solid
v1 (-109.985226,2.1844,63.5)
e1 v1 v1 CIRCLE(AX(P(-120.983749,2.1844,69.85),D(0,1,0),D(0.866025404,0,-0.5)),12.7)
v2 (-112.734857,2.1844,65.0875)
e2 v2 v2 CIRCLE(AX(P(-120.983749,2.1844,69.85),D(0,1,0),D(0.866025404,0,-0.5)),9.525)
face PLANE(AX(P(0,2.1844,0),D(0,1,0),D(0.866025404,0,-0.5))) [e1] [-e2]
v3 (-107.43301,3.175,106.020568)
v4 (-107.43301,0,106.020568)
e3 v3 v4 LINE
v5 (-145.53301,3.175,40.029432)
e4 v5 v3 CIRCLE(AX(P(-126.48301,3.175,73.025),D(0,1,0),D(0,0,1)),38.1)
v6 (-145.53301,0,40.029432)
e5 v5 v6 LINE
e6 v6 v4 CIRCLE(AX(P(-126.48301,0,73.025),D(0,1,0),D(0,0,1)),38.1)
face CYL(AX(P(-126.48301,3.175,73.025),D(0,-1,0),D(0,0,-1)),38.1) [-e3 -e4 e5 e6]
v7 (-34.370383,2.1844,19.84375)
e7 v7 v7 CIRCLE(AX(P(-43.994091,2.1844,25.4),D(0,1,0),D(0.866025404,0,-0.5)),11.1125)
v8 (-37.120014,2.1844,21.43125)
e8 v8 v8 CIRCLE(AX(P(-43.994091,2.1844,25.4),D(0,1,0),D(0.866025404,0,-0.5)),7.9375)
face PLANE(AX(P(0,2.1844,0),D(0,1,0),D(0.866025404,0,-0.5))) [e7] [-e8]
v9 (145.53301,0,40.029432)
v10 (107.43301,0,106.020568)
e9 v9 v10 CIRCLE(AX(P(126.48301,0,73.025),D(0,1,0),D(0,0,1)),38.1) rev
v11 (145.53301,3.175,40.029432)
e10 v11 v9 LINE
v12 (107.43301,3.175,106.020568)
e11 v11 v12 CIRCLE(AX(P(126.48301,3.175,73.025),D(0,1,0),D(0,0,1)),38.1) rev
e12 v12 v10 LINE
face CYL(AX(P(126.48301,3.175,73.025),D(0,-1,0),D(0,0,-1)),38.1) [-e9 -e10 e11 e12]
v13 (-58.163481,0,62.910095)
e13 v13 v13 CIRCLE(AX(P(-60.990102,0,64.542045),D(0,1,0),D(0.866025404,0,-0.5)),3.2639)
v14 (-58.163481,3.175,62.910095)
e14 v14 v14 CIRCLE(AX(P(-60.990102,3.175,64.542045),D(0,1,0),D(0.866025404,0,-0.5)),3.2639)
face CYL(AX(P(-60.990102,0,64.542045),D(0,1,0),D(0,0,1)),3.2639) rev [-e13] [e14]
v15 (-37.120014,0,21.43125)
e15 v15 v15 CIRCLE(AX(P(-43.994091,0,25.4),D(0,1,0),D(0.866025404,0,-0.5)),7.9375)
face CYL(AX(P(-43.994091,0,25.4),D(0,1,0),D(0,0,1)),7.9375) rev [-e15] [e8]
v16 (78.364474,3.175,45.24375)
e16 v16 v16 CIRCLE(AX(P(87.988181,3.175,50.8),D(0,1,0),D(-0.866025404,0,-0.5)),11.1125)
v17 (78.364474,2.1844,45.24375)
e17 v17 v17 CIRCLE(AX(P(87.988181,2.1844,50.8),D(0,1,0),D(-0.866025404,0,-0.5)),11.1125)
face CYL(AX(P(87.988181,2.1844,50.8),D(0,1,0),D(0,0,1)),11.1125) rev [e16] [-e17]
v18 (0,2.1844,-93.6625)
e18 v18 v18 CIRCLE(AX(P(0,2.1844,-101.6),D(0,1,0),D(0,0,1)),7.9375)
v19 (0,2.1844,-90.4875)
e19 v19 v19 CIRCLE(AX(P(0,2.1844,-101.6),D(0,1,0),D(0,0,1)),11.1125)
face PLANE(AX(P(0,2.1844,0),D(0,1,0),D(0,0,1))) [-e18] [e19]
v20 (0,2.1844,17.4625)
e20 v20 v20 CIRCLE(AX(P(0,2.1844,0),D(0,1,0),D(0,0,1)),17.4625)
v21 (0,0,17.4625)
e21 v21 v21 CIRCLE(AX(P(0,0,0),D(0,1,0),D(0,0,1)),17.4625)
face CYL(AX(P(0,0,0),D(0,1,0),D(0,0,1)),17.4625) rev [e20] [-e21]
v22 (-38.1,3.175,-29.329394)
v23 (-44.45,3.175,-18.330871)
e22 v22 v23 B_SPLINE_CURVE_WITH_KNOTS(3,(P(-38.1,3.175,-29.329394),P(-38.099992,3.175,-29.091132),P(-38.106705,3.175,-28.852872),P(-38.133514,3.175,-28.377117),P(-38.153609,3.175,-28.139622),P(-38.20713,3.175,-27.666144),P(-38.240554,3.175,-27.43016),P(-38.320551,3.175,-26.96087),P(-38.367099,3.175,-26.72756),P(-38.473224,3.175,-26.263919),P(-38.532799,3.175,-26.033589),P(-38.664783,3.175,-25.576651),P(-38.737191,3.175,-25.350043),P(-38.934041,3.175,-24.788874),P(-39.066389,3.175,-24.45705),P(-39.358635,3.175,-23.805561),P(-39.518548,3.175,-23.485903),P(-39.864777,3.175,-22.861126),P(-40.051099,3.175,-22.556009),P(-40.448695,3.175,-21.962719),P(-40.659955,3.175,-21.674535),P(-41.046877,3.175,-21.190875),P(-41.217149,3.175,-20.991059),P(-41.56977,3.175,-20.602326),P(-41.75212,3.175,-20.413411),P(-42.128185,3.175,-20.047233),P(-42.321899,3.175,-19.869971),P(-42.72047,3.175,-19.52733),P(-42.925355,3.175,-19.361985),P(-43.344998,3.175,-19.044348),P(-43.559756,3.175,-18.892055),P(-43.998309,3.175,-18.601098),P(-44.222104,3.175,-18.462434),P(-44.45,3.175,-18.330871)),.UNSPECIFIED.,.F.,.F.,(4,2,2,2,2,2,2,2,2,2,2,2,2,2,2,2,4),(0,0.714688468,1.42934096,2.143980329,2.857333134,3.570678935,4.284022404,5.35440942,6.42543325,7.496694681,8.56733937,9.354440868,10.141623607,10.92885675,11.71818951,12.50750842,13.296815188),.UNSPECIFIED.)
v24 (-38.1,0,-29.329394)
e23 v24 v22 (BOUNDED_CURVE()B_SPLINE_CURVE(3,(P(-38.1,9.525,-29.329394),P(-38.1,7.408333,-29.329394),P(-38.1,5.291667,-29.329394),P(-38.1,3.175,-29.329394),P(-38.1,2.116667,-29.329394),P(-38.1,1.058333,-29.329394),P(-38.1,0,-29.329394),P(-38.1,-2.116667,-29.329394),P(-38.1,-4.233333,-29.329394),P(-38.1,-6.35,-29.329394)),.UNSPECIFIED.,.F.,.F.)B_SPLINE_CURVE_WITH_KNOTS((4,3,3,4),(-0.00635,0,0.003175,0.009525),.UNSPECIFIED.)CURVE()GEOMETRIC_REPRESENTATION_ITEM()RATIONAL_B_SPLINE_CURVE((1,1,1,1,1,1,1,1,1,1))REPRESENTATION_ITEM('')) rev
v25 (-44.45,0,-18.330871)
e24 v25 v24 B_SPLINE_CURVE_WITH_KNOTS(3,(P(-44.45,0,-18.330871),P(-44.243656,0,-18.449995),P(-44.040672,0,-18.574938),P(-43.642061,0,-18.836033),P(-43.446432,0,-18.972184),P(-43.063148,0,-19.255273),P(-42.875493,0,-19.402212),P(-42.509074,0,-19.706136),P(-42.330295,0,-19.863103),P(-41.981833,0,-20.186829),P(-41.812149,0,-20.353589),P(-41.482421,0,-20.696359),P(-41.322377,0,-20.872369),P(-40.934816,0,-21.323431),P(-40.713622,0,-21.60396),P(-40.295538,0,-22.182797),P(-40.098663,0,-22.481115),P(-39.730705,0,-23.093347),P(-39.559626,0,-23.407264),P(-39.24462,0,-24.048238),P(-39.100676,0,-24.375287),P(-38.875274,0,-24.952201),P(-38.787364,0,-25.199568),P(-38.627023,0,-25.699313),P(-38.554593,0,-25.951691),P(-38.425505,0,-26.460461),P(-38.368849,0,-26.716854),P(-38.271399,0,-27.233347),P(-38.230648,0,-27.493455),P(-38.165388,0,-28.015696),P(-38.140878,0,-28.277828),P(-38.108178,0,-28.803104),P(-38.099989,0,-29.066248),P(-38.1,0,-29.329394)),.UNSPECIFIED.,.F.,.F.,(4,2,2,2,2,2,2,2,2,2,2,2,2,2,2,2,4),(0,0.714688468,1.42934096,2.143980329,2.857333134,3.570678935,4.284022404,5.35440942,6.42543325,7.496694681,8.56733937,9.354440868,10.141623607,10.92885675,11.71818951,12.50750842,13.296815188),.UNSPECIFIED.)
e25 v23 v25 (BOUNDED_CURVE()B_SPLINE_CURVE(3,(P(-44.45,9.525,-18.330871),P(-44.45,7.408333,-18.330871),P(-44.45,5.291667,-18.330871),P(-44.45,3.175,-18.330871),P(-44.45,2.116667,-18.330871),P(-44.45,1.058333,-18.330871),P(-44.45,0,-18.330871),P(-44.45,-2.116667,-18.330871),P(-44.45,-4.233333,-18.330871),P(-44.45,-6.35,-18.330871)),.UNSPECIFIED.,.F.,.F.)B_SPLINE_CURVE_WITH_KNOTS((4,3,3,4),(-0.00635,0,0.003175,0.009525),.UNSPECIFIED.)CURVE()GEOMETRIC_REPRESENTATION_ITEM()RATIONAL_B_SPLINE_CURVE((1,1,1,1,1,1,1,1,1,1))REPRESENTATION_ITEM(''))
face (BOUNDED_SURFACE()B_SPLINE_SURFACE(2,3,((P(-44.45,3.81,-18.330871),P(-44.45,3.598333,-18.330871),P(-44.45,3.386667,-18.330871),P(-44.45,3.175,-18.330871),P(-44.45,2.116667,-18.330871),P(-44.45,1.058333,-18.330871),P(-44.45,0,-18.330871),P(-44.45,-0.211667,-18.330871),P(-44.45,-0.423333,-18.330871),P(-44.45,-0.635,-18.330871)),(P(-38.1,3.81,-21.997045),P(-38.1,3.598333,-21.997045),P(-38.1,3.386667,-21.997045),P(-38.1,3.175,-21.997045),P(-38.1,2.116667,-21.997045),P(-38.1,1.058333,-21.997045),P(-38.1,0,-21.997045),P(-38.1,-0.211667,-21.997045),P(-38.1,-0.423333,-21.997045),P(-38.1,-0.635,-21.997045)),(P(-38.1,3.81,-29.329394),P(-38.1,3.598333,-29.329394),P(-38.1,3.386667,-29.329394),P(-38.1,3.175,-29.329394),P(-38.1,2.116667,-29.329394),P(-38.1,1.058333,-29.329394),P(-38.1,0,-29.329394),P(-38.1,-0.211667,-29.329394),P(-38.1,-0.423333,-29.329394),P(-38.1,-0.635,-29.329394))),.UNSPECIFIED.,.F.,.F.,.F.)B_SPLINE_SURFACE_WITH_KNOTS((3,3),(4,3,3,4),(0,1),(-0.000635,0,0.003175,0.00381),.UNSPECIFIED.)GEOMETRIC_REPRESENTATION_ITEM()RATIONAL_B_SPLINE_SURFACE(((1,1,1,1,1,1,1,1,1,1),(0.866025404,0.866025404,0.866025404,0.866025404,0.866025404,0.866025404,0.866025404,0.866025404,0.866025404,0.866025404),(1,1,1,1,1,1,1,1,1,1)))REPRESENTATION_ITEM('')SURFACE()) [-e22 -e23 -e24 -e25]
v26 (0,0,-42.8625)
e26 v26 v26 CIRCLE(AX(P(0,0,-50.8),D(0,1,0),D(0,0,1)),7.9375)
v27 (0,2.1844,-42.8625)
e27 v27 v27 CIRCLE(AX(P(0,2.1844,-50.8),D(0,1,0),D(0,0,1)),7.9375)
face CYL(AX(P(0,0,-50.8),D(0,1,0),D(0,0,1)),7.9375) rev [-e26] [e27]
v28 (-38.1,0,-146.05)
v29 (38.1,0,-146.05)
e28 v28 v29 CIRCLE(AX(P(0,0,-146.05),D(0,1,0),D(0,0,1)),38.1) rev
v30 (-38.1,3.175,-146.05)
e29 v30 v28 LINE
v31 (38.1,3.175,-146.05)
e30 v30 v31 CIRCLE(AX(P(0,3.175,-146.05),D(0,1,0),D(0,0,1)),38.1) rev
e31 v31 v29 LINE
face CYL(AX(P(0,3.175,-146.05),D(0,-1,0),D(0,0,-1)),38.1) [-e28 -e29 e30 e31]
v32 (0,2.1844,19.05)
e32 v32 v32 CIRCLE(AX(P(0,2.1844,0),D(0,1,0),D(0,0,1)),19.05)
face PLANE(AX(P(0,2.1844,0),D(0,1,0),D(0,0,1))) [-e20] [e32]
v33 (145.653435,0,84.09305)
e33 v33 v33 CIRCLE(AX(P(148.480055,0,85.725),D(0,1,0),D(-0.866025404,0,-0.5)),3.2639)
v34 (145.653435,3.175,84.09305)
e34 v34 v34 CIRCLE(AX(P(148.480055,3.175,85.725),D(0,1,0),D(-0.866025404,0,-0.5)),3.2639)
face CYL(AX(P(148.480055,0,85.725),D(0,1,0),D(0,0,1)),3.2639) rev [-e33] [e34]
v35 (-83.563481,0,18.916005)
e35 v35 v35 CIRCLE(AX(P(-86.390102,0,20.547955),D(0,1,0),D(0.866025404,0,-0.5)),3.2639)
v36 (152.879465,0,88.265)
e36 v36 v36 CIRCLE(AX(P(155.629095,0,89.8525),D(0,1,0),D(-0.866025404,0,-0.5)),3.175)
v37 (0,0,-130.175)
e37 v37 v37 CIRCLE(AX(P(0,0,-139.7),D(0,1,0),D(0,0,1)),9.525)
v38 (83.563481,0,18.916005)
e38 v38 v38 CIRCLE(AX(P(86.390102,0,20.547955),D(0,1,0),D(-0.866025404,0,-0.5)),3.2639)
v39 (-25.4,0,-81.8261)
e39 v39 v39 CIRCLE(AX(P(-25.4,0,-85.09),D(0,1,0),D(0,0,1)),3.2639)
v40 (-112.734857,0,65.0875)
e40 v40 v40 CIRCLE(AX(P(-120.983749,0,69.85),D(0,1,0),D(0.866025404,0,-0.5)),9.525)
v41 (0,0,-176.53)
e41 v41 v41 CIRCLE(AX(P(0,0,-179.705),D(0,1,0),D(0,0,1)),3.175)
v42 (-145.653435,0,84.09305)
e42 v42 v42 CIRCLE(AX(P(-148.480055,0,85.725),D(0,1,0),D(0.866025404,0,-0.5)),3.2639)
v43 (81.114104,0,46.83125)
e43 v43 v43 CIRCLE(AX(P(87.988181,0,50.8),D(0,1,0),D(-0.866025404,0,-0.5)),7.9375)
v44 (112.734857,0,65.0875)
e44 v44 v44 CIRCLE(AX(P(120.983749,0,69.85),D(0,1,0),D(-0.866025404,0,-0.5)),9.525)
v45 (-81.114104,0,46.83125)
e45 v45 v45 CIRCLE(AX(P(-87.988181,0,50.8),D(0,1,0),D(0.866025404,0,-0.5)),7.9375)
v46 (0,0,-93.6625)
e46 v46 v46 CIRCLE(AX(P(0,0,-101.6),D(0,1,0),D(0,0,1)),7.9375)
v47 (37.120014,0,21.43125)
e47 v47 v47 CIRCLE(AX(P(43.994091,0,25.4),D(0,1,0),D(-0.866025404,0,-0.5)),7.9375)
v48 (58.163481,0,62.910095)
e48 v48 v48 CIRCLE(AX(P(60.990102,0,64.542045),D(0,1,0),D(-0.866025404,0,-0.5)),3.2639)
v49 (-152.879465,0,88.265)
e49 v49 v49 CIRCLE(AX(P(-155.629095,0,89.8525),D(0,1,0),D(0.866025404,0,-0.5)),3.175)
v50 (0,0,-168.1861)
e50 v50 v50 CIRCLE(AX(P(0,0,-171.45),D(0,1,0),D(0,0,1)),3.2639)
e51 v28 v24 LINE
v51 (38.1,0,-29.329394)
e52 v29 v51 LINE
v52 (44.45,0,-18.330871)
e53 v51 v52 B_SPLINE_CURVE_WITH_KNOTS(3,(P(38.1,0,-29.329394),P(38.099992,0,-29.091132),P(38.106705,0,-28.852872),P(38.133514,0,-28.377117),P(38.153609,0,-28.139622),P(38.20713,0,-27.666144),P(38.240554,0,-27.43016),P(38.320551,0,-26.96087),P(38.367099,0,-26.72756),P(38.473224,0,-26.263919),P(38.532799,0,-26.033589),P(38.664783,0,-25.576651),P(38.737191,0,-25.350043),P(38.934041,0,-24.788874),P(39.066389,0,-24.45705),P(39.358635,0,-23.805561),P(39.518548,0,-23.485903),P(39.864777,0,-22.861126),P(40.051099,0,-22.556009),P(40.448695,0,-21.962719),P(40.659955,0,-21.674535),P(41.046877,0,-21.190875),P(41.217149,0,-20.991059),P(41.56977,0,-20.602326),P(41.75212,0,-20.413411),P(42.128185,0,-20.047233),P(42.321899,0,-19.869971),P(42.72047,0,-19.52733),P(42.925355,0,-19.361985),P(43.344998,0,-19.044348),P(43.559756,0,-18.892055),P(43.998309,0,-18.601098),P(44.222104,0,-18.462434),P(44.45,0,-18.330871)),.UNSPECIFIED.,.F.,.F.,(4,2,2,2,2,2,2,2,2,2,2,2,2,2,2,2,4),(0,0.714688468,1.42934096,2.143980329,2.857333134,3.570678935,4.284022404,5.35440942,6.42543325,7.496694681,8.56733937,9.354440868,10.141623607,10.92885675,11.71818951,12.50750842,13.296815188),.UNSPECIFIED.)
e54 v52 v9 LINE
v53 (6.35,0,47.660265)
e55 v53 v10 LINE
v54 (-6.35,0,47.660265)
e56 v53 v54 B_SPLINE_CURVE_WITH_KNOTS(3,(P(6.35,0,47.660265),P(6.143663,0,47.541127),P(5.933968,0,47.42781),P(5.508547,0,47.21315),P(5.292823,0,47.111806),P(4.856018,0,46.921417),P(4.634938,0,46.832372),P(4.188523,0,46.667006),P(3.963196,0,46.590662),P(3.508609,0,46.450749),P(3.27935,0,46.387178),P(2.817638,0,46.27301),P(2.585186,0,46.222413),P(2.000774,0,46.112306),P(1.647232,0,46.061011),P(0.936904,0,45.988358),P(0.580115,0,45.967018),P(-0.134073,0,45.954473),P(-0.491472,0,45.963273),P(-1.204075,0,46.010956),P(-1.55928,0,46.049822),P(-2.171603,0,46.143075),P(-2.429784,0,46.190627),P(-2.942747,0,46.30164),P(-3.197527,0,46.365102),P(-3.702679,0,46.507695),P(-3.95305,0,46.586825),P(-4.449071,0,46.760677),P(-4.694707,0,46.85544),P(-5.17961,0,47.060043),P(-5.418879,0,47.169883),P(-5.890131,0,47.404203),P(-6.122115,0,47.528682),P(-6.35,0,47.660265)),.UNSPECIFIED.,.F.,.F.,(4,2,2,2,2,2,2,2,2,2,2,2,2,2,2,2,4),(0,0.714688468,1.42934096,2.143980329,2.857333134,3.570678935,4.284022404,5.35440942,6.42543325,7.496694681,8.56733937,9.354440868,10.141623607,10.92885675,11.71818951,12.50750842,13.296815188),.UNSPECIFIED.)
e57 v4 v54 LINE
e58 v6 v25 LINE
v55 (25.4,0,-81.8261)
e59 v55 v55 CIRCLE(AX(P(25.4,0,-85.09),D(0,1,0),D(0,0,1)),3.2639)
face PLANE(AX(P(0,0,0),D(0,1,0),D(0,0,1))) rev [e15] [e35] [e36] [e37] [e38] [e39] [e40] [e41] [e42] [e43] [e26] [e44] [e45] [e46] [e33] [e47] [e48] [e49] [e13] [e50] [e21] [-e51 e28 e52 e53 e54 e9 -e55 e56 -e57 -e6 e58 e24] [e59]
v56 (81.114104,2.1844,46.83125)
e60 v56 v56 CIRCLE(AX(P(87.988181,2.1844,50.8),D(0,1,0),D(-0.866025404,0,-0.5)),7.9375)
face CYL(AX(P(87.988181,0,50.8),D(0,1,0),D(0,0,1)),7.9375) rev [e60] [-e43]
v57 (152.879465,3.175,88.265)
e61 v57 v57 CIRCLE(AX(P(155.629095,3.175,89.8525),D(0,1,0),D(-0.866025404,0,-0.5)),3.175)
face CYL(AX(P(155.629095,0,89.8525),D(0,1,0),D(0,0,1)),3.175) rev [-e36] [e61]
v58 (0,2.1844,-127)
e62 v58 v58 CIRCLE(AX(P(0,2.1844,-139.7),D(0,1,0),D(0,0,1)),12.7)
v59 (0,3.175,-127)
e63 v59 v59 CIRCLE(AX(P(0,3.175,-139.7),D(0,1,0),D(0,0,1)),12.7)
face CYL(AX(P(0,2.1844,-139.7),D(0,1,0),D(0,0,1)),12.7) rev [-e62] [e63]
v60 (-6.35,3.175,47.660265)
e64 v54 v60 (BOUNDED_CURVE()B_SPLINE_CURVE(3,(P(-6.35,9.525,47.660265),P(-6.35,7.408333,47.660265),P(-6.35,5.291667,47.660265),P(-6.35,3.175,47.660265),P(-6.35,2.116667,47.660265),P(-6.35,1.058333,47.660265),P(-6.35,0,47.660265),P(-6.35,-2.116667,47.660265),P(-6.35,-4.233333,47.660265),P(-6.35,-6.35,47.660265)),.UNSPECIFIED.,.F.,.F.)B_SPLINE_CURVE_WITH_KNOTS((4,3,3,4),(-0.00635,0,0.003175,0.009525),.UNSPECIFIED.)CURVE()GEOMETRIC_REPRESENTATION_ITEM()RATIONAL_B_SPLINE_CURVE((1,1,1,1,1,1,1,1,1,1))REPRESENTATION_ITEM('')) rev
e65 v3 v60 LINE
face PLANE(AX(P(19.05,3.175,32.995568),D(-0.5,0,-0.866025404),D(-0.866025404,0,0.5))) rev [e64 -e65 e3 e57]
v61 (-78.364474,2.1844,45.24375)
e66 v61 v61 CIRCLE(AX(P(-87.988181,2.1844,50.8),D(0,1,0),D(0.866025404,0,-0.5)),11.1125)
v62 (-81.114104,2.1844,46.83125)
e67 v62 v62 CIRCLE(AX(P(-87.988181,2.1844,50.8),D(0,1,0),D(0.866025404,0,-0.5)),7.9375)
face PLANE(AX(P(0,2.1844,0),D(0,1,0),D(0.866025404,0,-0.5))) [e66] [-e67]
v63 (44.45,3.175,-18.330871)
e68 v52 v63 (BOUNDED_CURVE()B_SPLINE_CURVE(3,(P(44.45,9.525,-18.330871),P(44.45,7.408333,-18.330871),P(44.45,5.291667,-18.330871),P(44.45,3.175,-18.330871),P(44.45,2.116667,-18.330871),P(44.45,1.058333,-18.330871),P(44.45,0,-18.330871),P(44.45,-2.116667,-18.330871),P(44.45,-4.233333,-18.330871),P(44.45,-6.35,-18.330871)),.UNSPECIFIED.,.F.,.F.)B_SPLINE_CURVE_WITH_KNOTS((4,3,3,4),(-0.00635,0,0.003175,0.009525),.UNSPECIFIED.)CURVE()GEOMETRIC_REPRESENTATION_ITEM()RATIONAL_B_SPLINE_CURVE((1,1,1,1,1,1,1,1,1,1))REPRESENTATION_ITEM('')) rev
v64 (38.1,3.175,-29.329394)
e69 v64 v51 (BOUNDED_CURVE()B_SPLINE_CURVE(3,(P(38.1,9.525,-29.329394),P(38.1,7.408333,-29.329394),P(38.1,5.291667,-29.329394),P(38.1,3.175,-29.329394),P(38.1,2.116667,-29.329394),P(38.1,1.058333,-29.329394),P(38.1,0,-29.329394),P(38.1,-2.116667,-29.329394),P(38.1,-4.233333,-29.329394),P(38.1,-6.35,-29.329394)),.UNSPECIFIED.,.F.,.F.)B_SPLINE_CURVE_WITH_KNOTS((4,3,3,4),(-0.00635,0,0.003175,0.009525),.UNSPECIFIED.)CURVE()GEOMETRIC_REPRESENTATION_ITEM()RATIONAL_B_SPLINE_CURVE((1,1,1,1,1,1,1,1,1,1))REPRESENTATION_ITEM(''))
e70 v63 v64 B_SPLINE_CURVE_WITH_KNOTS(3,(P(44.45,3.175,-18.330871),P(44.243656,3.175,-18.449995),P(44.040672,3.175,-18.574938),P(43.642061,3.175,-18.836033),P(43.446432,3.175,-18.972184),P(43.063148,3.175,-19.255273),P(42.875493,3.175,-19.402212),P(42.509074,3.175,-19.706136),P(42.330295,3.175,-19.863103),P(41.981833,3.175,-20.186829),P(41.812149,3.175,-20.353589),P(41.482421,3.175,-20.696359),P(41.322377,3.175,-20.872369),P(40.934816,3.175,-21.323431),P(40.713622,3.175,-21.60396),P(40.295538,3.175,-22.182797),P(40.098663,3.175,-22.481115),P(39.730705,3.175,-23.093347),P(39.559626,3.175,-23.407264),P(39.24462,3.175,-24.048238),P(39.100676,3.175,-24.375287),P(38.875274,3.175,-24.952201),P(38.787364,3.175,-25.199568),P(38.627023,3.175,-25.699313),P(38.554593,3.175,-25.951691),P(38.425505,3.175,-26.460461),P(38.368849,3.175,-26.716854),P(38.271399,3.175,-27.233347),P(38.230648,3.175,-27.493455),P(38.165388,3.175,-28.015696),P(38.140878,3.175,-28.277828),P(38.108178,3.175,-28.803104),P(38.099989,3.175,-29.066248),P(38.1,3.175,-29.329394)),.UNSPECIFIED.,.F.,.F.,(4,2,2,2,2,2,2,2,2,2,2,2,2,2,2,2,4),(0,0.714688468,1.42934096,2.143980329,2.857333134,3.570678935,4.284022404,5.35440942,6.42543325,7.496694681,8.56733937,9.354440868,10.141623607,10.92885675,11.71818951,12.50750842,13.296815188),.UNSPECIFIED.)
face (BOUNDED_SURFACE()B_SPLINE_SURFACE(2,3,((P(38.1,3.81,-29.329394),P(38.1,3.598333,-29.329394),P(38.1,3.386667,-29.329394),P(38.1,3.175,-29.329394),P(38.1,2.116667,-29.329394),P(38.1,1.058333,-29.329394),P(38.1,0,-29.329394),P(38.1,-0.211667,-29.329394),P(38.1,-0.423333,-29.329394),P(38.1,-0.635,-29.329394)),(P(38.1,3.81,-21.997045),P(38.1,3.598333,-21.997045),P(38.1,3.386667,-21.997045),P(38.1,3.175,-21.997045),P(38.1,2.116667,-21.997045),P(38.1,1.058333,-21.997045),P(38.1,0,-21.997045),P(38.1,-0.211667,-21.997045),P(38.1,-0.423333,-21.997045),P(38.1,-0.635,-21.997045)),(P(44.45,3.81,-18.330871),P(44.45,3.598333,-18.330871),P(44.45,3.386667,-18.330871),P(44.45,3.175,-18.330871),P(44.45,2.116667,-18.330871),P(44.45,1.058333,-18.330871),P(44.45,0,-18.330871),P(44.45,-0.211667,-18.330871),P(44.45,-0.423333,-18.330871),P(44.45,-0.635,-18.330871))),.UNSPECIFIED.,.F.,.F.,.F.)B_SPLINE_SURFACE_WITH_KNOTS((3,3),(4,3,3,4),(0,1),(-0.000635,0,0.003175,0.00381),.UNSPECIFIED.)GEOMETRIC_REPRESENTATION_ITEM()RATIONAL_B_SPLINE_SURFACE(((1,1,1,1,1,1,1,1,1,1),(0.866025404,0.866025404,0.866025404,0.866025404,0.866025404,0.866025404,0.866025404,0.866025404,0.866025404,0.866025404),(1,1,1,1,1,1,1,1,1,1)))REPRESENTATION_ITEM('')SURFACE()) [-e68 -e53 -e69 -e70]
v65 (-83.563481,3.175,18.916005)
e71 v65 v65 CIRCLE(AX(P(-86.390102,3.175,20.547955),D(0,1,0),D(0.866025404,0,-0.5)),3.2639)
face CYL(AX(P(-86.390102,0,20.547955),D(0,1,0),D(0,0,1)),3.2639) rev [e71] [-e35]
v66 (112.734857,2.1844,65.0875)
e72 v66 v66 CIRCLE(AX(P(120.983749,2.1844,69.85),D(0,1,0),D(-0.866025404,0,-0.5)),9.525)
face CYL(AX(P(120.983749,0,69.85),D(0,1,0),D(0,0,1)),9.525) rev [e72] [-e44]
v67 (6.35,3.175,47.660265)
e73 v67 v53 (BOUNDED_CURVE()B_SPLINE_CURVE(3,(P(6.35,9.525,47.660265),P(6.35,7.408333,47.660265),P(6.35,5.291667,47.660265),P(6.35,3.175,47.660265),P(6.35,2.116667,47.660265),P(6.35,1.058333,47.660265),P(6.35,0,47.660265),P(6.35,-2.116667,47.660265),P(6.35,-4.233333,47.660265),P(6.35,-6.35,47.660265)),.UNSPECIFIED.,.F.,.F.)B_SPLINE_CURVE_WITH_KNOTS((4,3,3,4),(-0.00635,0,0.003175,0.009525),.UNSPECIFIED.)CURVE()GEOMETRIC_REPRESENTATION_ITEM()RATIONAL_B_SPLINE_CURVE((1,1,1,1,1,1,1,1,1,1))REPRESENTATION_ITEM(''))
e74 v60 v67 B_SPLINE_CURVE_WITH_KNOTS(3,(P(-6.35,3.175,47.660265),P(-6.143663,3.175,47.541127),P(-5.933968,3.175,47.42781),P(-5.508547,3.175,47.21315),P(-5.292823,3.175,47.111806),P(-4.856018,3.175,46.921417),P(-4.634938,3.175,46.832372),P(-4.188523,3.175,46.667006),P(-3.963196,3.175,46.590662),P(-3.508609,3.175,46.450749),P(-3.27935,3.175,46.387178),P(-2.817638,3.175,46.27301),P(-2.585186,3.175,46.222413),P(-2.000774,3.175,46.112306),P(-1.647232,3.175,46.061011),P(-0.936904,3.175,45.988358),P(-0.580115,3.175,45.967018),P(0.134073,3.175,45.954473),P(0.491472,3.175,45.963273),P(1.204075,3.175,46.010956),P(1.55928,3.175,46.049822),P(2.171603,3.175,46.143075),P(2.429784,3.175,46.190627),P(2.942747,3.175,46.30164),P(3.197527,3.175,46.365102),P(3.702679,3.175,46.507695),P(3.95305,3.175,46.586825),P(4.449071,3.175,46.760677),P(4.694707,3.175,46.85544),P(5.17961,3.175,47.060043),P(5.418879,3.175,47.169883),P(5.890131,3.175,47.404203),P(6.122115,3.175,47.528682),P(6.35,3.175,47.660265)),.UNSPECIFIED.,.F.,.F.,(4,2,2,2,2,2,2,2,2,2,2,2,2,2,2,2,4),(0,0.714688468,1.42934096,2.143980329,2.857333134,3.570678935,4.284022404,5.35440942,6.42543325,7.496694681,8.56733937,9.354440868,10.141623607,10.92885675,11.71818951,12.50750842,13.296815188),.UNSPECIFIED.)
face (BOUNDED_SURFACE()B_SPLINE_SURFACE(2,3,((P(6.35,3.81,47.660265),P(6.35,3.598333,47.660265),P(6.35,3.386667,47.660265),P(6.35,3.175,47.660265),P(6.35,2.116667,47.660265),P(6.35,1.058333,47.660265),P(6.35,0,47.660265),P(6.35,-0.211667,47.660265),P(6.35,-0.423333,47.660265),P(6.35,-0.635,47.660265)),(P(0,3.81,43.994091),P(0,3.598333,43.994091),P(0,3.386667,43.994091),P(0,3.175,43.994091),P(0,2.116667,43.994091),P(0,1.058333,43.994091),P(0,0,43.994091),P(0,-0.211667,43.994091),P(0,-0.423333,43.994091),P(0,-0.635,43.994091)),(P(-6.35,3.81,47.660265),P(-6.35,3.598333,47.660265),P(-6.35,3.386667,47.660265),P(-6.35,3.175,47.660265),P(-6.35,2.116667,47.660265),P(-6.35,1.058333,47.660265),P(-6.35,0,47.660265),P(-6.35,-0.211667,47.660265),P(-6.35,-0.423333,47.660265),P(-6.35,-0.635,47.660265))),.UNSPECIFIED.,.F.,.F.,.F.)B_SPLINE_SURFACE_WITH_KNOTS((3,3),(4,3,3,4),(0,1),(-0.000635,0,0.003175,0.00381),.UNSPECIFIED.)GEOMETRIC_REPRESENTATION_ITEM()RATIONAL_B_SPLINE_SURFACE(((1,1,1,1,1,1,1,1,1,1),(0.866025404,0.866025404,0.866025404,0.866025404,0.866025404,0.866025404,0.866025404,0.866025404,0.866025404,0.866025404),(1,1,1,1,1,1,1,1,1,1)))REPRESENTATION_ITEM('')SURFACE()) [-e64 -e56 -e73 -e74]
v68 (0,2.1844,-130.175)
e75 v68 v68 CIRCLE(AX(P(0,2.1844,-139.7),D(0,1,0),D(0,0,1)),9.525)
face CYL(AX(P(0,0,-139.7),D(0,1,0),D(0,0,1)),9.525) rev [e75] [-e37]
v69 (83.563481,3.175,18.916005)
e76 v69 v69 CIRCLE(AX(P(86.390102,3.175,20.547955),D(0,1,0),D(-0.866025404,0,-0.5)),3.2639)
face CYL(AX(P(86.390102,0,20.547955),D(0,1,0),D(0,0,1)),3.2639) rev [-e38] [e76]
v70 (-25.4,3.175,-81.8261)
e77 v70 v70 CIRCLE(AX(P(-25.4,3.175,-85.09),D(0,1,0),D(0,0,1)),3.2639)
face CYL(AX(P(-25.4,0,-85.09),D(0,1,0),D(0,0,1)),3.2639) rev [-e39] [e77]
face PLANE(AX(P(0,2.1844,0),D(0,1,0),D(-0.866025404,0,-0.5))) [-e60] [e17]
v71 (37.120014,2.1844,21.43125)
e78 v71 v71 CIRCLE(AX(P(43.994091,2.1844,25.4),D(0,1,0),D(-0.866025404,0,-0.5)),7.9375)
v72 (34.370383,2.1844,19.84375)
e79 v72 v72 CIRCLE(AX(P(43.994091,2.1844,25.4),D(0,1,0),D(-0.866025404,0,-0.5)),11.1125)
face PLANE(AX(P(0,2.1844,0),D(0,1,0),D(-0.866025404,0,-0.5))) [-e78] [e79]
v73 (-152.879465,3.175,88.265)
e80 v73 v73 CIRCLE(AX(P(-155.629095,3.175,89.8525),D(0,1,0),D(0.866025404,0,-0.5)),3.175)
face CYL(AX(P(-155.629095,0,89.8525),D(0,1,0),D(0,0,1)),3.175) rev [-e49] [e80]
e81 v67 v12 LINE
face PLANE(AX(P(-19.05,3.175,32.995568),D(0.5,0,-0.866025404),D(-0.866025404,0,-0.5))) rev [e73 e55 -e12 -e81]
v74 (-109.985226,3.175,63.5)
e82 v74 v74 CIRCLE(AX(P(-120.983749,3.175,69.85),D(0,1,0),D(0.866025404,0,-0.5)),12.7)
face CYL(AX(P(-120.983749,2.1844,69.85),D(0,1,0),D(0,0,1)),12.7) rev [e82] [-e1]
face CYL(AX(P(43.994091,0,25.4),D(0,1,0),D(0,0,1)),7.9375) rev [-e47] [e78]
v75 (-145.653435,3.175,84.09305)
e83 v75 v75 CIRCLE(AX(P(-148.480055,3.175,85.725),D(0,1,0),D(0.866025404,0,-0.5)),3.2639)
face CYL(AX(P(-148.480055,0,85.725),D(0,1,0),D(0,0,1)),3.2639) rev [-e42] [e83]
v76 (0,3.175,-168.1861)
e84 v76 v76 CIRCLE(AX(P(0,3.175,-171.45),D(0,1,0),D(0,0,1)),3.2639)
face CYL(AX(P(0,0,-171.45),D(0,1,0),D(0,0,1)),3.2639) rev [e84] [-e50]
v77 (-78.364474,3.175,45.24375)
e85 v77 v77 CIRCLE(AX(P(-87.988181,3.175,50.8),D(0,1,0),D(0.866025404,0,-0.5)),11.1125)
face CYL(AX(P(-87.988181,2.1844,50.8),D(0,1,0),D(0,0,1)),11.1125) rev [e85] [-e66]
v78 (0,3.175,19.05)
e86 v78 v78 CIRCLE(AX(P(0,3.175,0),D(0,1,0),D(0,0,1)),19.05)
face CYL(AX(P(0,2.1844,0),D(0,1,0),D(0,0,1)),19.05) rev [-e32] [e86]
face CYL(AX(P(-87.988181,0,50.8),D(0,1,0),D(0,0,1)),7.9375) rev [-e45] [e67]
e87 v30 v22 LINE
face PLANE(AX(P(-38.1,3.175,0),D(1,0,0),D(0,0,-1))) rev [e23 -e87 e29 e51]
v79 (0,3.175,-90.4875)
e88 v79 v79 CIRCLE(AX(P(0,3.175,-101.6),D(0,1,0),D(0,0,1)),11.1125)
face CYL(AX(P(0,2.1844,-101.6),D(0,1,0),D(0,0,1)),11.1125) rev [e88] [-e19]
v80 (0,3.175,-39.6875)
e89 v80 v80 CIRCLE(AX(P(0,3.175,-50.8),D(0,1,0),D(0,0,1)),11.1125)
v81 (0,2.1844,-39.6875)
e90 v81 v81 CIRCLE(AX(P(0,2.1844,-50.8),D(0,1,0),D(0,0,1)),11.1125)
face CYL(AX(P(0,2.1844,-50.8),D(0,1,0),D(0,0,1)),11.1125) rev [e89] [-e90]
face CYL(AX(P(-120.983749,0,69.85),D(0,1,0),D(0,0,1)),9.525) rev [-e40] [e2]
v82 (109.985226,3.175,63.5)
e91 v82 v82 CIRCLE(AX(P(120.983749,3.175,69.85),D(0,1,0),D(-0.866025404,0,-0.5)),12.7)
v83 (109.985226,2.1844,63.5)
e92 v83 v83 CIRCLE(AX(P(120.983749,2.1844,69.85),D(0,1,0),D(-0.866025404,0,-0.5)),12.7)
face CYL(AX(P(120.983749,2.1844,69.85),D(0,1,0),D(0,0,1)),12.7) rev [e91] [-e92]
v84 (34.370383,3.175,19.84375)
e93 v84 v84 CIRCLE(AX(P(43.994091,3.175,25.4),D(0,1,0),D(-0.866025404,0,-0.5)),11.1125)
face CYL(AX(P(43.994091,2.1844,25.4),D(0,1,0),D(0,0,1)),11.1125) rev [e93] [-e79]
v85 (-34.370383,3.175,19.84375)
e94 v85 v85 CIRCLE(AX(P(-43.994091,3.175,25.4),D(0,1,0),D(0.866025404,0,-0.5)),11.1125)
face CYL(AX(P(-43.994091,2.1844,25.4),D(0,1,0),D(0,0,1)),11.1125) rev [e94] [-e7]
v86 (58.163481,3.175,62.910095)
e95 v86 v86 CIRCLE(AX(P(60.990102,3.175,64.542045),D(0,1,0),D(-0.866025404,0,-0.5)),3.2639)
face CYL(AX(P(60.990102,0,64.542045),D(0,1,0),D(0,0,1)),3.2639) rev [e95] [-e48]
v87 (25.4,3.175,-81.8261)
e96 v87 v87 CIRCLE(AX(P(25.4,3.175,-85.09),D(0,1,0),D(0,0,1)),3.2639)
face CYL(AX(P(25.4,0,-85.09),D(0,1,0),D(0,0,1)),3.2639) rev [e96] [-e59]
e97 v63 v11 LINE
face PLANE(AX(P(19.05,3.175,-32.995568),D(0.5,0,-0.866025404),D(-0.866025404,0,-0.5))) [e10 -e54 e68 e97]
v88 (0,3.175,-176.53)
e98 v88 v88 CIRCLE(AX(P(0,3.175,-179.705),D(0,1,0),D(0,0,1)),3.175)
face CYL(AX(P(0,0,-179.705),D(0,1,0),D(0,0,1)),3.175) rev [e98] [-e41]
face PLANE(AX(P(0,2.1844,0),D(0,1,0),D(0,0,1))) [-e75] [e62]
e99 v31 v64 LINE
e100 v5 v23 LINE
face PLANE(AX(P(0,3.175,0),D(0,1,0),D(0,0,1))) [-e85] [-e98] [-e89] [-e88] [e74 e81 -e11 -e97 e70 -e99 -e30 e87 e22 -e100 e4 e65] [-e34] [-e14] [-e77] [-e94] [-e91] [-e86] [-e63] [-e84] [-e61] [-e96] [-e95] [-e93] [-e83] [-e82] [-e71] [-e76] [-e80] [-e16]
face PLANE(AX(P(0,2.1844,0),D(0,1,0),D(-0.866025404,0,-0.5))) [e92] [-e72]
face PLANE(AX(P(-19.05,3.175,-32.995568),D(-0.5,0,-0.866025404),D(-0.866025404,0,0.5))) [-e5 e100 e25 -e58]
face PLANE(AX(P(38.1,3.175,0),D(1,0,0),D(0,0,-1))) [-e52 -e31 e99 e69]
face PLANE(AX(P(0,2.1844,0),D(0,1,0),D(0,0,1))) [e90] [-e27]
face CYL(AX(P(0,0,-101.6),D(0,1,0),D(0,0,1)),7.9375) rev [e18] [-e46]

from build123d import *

# Parameters (mm, degrees)
BOSS_EXTRUDE1_DEPTH = 3.175
VARFILLET1_R        = 12.7
SKETCH2_R           = 17.4625
SKETCH2_R_2         = 7.9375
SKETCH2_R_3         = 9.525
SKETCH2_R_4         = 3.2639
SKETCH2_R_5         = 3.175
CUT_EXTRUDE1_DEPTH  = 3.175
SKETCH2_3_R         = 19.05
SKETCH2_3_R_2       = 17.4625
SKETCH2_3_R_3       = 11.1125
SKETCH2_3_R_4       = 7.9375
SKETCH2_3_R_5       = 12.7
SKETCH2_3_R_6       = 9.525
CUT_EXTRUDE2_DEPTH  = 0.9906
CIRPATTERN1_COUNT   = 3
CIRPATTERN2_COUNT   = 3


with BuildPart() as part:
    # Sketch1 → Boss-Extrude1 (new body)
    with BuildSketch(Plane(origin=(0, 0, 0), x_dir=(1, 0, 0), z_dir=(0, 1, 0))):
        with BuildLine():
            ThreePointArc((38.1, 146.05), (0, 184.15), (-38.1, 146.05))
            Line((-38.1, 146.05), (-38.1, 21.997045256))
            Line((-38.1, 21.997045256), (-145.533010223, -40.029432116))
            ThreePointArc((-145.533010223, -40.029432116), (-159.478578107, -92.075), (-107.433010223, -106.020567884))
            Line((-107.433010223, -106.020567884), (0, -43.994090512))
            Line((0, -43.994090512), (107.433010223, -106.020567884))
            ThreePointArc((107.433010223, -106.020567884), (159.478578107, -92.075), (145.533010223, -40.029432116))
            Line((145.533010223, -40.029432116), (38.1, 21.997045256))
            Line((38.1, 21.997045256), (38.1, 146.05))
        make_face()
    extrude(amount=BOSS_EXTRUDE1_DEPTH)

    # VarFillet1
    varfillet1_edges = [part.edges().sort_by_distance(p)[0] for p in [
        (0, 1.5875, 43.994090512),
        (-38.1, 1.5875, -21.997045256),
        (38.1, 1.5875, -21.997045256),
    ]]
    fillet(varfillet1_edges, radius=VARFILLET1_R)

    # Sketch2 → Cut-Extrude1 (cut)
    with BuildSketch(Plane(origin=(0, 3.175, 0), x_dir=(1, 0, 0), z_dir=(0, 1, 0))):
        Circle(SKETCH2_R)
        with Locations((0, 50.8)):
            Circle(SKETCH2_R_2)
        with Locations((0, 101.6)):
            Circle(SKETCH2_R_2)
        with Locations((0, 139.7)):
            Circle(SKETCH2_R_3)
        with Locations((-25.4, 85.09)):
            Circle(SKETCH2_R_4)
        with Locations((25.4, 85.09)):
            Circle(SKETCH2_R_4)
        with Locations((0, 171.45)):
            Circle(SKETCH2_R_4)
        with Locations((0, 179.705)):
            Circle(SKETCH2_R_5)
    cut_extrude1 = extrude(amount=-CUT_EXTRUDE1_DEPTH, mode=Mode.SUBTRACT)

    # Sketch2<3> → Cut-Extrude2 (cut)
    # profile 1 of 4: a face of its own
    with BuildSketch(Plane(origin=(0, 3.175, 0), x_dir=(1, 0, 0), z_dir=(0, 1, 0))):
        Circle(SKETCH2_3_R)
        Circle(SKETCH2_3_R_2, mode=Mode.SUBTRACT)
    # profile 2 of 4: a face of its own
    with BuildSketch(Plane(origin=(0, 3.175, 0), x_dir=(1, 0, 0), z_dir=(0, 1, 0))):
        with Locations((0, 50.8)):
            Circle(SKETCH2_3_R_3)
        with Locations((0, 50.8)):
            Circle(SKETCH2_3_R_4, mode=Mode.SUBTRACT)
    # profile 3 of 4: a face of its own
    with BuildSketch(Plane(origin=(0, 3.175, 0), x_dir=(1, 0, 0), z_dir=(0, 1, 0))):
        with Locations((0, 101.6)):
            Circle(SKETCH2_3_R_3)
        with Locations((0, 101.6)):
            Circle(SKETCH2_3_R_4, mode=Mode.SUBTRACT)
    # profile 4 of 4: a face of its own
    with BuildSketch(Plane(origin=(0, 3.175, 0), x_dir=(1, 0, 0), z_dir=(0, 1, 0))):
        with Locations((0, 139.7)):
            Circle(SKETCH2_3_R_5)
        with Locations((0, 139.7)):
            Circle(SKETCH2_3_R_6, mode=Mode.SUBTRACT)
    cut_extrude2 = extrude(amount=-CUT_EXTRUDE2_DEPTH, mode=Mode.SUBTRACT)

    # CirPattern1: Cut-Extrude1 ×3 about axis
    cirpattern1_axis = Axis((0, 3.175, 0), (0, 1, 0))
    for i in range(1, CIRPATTERN1_COUNT):
        add(cut_extrude1.rotate(cirpattern1_axis, i * 360 / CIRPATTERN1_COUNT), mode=Mode.SUBTRACT)

    # CirPattern2: Cut-Extrude2 ×3 about axis
    cirpattern2_axis = Axis((0, 2.1844, 0), (0, 1, 0))
    for i in range(1, CIRPATTERN2_COUNT):
        add(cut_extrude2.rotate(cirpattern2_axis, i * 360 / CIRPATTERN2_COUNT), mode=Mode.SUBTRACT)


solid = part.part
